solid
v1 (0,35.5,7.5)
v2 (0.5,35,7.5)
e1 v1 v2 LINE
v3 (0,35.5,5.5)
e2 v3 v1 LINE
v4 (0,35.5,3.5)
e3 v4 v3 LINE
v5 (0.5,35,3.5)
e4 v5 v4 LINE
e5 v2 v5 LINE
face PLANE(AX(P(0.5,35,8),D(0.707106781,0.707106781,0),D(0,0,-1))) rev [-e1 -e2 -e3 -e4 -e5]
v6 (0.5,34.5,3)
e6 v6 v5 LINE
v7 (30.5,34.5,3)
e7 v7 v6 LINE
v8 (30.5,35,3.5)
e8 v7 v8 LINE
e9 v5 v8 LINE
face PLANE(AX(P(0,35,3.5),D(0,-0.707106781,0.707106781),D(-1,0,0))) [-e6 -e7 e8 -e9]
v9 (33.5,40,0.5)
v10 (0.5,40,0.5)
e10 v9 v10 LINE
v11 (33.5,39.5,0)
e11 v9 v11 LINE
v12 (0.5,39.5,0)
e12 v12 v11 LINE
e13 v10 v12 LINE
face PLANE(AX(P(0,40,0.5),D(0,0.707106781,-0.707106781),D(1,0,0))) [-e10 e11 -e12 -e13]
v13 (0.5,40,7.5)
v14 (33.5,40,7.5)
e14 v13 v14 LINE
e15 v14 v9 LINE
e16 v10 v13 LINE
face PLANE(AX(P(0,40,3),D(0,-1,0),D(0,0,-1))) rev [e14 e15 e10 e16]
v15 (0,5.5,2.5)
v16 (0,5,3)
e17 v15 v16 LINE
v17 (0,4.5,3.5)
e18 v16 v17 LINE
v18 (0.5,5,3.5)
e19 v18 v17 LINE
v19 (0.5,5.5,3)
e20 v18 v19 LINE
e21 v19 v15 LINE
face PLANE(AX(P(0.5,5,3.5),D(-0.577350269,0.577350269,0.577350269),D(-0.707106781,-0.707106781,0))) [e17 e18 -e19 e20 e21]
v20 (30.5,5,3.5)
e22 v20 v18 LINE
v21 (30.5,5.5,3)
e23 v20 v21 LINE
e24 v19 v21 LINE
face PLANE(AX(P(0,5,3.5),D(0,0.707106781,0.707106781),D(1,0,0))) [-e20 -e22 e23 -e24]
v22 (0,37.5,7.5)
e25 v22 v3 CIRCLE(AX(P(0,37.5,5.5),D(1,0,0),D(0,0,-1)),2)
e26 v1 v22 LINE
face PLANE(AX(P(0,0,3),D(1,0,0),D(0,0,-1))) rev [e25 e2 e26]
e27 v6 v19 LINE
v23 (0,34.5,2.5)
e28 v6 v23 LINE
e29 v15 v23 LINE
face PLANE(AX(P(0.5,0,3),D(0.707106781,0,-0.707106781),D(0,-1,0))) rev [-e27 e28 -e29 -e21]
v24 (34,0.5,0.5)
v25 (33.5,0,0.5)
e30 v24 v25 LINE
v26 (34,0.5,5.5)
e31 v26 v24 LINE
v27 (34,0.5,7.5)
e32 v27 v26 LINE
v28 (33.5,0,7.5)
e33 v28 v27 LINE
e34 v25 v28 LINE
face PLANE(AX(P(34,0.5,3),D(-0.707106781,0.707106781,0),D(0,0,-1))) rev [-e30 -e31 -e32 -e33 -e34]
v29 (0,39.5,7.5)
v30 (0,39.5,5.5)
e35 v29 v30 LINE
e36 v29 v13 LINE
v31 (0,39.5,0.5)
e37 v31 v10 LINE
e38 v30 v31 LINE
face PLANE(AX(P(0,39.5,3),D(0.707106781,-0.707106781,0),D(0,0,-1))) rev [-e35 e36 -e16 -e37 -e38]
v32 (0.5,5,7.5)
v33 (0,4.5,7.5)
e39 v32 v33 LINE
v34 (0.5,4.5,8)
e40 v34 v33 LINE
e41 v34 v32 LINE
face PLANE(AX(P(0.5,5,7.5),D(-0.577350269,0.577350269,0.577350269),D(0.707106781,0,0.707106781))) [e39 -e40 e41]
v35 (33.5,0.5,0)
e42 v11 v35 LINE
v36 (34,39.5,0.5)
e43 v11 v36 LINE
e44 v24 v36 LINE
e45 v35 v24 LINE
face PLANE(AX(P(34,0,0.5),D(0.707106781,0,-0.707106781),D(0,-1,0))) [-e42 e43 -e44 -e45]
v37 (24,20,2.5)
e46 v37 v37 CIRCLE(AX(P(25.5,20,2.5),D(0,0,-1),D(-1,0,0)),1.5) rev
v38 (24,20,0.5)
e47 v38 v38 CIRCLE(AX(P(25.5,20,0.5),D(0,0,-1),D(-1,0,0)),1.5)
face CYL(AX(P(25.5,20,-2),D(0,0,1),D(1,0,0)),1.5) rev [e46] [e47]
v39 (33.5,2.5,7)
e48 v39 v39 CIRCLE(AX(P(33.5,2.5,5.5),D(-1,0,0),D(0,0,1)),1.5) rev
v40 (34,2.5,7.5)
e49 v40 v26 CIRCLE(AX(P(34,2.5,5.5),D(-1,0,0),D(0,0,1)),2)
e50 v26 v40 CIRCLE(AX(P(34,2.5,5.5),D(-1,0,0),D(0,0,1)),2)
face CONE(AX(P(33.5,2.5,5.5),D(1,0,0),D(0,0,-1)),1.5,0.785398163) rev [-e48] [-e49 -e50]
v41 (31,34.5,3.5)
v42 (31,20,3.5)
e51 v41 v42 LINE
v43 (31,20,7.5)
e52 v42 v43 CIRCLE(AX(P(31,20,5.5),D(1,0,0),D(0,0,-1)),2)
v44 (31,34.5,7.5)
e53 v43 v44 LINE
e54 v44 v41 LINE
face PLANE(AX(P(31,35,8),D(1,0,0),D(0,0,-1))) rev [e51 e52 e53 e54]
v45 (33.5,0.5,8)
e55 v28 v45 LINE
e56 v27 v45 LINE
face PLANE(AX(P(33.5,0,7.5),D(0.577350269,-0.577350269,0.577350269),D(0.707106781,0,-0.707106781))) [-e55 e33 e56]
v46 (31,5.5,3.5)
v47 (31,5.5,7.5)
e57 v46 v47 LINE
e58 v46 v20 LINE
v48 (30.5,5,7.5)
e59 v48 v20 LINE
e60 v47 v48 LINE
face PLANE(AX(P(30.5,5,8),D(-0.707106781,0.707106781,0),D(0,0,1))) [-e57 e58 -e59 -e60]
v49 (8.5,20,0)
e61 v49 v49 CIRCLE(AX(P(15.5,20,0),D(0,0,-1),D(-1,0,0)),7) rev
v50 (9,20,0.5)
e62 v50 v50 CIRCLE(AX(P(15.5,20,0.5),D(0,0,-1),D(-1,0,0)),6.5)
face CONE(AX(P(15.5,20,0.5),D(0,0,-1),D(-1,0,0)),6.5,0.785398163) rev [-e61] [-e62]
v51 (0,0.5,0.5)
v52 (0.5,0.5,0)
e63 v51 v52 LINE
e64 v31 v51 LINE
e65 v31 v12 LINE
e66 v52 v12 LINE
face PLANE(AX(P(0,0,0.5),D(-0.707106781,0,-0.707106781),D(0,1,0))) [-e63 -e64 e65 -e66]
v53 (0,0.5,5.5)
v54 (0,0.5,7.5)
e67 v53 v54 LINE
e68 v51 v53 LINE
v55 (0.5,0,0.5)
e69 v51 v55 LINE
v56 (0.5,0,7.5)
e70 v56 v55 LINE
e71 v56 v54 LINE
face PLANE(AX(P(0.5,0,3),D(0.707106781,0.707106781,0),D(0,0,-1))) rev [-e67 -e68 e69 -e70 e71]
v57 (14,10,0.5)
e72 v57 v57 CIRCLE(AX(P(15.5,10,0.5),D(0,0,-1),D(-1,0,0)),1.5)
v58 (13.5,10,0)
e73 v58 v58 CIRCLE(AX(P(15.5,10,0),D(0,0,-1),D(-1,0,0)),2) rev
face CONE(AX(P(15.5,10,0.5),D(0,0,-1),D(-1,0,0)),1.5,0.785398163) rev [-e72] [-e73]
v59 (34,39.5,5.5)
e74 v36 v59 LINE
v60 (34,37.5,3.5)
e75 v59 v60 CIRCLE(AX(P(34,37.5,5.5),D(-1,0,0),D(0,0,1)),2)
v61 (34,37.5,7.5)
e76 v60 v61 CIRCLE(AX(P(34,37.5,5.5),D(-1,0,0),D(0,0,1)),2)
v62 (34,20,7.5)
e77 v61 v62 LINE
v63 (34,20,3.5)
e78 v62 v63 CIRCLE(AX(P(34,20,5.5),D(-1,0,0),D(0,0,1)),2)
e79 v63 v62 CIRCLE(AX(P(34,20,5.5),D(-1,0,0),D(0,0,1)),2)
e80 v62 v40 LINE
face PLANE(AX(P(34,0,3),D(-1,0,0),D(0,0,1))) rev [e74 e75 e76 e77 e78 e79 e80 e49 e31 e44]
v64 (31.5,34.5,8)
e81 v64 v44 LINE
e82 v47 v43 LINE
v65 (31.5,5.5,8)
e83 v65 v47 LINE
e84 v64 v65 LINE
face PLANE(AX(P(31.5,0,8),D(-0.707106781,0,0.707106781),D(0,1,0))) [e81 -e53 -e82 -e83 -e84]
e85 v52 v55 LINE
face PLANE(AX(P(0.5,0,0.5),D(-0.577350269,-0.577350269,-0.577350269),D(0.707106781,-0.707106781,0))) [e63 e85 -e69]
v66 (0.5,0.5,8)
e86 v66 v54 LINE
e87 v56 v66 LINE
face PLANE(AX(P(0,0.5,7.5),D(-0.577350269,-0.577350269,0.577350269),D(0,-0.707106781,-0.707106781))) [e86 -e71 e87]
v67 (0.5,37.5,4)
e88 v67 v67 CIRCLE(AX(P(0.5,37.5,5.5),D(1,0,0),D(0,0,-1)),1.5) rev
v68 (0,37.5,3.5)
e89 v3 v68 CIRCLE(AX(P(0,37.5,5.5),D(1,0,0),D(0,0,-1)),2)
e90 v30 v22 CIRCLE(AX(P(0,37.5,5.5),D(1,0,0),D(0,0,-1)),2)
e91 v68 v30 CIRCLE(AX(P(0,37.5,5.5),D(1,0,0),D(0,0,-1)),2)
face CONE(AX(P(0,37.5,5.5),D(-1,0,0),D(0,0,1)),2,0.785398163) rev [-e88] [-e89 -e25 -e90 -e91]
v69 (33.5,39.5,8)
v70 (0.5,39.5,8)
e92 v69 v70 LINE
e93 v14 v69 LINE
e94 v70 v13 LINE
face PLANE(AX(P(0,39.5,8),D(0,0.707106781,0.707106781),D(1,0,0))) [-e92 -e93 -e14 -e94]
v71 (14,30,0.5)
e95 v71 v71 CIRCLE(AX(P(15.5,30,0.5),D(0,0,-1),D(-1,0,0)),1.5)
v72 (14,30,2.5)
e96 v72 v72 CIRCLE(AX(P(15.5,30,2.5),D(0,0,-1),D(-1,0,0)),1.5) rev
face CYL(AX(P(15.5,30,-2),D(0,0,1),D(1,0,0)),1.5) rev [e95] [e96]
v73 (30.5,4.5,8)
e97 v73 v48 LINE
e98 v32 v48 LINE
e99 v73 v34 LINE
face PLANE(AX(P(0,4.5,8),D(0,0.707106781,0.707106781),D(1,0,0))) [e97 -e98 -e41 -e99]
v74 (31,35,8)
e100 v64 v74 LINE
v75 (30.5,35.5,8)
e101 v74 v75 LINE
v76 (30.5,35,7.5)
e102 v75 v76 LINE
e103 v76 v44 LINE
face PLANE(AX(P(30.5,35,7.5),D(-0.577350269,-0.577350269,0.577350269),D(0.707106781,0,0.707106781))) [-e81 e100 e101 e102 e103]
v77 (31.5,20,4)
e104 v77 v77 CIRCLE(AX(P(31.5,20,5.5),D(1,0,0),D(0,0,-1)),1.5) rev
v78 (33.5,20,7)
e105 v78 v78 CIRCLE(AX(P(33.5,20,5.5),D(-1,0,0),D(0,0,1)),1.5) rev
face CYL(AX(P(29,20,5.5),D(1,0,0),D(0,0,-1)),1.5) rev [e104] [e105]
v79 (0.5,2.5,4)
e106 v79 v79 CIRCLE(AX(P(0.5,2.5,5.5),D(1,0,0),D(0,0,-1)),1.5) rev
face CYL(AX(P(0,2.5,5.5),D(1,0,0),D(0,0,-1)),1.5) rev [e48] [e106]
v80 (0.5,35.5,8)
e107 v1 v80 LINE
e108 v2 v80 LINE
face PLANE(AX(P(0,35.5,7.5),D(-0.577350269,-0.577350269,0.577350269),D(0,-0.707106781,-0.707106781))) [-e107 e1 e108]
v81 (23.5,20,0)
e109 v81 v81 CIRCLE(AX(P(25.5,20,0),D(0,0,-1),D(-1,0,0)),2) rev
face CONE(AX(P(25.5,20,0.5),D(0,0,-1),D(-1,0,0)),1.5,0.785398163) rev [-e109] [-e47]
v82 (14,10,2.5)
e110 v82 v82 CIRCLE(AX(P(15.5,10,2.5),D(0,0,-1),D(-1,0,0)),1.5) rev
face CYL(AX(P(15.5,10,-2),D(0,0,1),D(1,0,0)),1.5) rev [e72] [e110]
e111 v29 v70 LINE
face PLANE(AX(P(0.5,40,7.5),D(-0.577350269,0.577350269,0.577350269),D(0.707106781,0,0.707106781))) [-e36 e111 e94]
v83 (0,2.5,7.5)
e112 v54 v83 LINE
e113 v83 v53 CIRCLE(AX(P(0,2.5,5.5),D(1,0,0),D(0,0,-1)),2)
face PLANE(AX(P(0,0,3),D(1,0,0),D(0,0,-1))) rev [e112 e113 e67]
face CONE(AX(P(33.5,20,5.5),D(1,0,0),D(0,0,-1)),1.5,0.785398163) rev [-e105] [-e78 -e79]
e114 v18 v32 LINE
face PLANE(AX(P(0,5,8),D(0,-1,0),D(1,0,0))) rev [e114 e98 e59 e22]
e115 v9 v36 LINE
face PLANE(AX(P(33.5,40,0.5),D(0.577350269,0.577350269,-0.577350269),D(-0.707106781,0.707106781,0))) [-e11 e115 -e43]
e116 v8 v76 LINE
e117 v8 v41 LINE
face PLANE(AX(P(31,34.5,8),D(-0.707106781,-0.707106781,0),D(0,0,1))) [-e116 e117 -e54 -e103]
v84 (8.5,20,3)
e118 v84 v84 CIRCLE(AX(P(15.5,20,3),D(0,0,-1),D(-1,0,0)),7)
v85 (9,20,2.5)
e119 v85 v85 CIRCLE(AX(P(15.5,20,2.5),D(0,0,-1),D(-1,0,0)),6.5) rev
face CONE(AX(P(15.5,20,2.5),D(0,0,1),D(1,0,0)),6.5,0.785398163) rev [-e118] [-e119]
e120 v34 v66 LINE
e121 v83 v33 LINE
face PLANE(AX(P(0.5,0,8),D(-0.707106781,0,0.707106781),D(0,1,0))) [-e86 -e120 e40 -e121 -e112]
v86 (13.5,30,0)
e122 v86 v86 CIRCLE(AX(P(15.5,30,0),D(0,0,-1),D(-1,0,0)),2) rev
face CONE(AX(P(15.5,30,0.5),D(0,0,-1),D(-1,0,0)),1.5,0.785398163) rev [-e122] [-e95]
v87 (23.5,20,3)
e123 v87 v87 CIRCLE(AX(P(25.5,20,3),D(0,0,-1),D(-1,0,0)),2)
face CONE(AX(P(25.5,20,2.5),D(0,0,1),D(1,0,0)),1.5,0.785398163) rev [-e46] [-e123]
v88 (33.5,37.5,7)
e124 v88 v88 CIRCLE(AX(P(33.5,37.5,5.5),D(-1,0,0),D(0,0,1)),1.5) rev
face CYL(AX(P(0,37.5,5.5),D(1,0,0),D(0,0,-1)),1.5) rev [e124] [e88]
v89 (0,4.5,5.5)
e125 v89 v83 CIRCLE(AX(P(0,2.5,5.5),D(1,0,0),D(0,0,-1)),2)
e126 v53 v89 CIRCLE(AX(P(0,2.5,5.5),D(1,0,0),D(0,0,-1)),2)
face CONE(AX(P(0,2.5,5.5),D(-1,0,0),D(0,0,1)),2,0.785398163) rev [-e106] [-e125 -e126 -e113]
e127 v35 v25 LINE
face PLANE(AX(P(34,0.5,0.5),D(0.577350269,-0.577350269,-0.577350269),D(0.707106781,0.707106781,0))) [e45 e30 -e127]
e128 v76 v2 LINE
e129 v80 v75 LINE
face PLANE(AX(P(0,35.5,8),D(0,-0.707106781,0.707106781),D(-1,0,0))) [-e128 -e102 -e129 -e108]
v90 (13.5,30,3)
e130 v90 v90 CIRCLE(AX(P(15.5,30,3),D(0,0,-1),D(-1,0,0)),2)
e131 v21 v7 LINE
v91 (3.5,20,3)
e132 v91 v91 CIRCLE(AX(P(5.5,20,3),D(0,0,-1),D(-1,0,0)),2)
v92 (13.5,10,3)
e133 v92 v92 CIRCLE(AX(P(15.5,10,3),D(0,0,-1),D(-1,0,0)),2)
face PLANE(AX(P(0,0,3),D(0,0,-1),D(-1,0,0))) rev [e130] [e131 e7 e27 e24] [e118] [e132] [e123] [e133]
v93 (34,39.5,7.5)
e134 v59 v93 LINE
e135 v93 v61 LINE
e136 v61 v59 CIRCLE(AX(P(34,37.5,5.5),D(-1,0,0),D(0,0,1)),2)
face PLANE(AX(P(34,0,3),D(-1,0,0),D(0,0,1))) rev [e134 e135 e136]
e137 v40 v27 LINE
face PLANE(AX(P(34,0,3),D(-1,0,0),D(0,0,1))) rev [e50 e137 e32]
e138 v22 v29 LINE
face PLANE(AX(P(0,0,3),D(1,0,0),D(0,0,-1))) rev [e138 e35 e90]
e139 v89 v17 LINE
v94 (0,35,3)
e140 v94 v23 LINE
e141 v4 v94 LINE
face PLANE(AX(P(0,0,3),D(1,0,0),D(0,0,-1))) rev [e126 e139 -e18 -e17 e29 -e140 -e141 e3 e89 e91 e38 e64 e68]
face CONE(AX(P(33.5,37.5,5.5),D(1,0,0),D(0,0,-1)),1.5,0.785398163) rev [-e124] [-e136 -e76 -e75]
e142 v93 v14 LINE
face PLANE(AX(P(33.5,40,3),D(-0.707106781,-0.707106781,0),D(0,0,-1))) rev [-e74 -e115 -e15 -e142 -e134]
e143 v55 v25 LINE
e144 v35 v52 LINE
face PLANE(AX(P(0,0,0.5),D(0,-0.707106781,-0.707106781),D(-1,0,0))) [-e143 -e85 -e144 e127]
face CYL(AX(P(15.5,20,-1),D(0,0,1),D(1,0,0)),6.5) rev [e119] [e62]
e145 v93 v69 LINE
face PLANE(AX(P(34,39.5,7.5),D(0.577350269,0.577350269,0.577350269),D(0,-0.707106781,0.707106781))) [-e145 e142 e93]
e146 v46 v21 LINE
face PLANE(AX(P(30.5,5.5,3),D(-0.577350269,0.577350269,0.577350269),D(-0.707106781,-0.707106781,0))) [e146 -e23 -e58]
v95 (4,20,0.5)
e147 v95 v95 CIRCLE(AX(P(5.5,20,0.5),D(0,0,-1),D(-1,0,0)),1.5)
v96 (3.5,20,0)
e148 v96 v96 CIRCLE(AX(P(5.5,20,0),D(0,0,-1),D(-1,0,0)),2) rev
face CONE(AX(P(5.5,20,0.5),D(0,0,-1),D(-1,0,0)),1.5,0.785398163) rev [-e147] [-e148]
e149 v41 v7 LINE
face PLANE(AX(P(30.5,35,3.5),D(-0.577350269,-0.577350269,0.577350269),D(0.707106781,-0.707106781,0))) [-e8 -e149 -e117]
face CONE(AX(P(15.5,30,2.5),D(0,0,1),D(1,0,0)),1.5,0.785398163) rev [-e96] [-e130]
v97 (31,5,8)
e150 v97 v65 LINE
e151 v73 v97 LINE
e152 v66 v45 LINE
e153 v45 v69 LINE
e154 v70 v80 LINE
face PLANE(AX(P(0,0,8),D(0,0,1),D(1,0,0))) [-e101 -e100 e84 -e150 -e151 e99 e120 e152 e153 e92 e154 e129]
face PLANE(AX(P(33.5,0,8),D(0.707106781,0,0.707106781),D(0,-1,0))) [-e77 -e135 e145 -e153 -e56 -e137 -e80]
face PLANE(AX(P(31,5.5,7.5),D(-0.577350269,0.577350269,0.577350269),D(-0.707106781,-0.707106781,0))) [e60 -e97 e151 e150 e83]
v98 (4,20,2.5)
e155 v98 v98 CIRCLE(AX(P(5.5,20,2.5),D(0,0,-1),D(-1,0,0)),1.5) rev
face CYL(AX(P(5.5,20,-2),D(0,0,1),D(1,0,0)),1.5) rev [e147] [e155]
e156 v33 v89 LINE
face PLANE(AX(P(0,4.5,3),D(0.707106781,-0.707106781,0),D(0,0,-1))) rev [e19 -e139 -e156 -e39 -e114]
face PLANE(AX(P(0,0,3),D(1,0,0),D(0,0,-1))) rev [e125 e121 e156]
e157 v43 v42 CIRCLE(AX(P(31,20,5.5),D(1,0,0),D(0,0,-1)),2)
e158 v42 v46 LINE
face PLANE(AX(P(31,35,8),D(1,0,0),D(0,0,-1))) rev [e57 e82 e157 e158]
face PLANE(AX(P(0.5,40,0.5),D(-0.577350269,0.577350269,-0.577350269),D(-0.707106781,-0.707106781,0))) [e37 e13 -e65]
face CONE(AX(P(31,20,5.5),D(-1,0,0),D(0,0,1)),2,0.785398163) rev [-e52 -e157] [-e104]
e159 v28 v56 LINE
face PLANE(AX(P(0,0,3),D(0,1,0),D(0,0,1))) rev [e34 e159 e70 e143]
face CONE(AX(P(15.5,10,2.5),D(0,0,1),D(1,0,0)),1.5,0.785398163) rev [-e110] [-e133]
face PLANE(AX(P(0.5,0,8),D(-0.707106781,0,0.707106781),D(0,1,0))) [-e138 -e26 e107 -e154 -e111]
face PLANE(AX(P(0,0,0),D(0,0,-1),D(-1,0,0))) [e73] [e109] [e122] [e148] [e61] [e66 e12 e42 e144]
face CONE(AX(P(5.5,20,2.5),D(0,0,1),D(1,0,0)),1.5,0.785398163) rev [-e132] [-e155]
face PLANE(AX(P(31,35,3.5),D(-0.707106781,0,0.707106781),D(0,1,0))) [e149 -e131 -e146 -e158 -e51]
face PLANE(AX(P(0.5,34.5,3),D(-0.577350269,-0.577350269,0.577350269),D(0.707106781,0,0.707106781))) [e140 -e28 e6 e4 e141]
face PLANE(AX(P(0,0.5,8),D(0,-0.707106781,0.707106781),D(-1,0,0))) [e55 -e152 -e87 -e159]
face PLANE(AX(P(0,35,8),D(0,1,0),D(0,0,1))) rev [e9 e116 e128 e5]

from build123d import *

# Parameters (mm, degrees)
ESQUISSE1_W             = 34
ESQUISSE1_H             = 40
BOSS_EXTRU_1_DEPTH      = 3
ESQUISSE2_R             = 6.5
ENL_V_MAT_EXTRU_1_DEPTH = 4
ESQUISSE5_R             = 1.5
ENL_V_MAT_EXTRU_3_DEPTH = 5
ESQUISSE9_W             = 34
ESQUISSE9_H             = 5
BOSS_EXTRU_5_DEPTH      = 5
ESQUISSE10_R            = 1.5
ENL_V_MAT_EXTRU_6_DEPTH = 54.103672189
ESQUISSE11_W            = 3
ESQUISSE11_H            = 30
BOSS_EXTRU_6_DEPTH      = 5
ESQUISSE12_R            = 1.5
ENL_V_MAT_EXTRU_7_DEPTH = 5
CHANFREIN1_SIZE         = 0.5


with BuildPart() as part:
    # Esquisse1 → Boss.-Extru.1 (new body)
    with BuildSketch(Plane.XY):
        with Locations((17, 20)):
            Rectangle(ESQUISSE1_W, ESQUISSE1_H)
    extrude(amount=BOSS_EXTRU_1_DEPTH)

    # Esquisse2 → Enlèv. mat.-Extru.1 (cut)
    with BuildSketch(Plane.XY.offset(3)):
        with Locations((15.5, 20)):
            Circle(ESQUISSE2_R)
    extrude(amount=-ENL_V_MAT_EXTRU_1_DEPTH, mode=Mode.SUBTRACT)

    # Esquisse5 → Enlèv. mat.-Extru.3 (cut)
    with BuildSketch(Plane.XY.offset(3)):
        with Locations((15.5, 30)):
            Circle(ESQUISSE5_R)
        with Locations((5.5, 20)):
            Circle(ESQUISSE5_R)
        with Locations((15.5, 10)):
            Circle(ESQUISSE5_R)
        with Locations((25.5, 20)):
            Circle(ESQUISSE5_R)
    extrude(amount=-ENL_V_MAT_EXTRU_3_DEPTH, mode=Mode.SUBTRACT)

    # Esquisse9 → Boss.-Extru.5 (add)
    with BuildSketch(Plane.XY.offset(3)):
        with Locations((17, 37.5)):
            Rectangle(ESQUISSE9_W, ESQUISSE9_H)
        with Locations((17, 2.5)):
            Rectangle(ESQUISSE9_W, ESQUISSE9_H)
    extrude(amount=BOSS_EXTRU_5_DEPTH)

    # Esquisse10 → Enlèv. mat.-Extru.6 (cut, through all)
    with BuildSketch(Plane(origin=(34, 0, 0), x_dir=(0, 0, -1), z_dir=(1, 0, 0))):
        with Locations((-5.5, 37.5)):
            Circle(ESQUISSE10_R)
        with Locations(Location((-5.5, 2.5, 0), (0, 0, 180))):
            Circle(ESQUISSE10_R)
    extrude(amount=-ENL_V_MAT_EXTRU_6_DEPTH, mode=Mode.SUBTRACT)

    # Esquisse11 → Boss.-Extru.6 (add)
    with BuildSketch(Plane.XY.offset(3)):
        with Locations((32.5, 20)):
            Rectangle(ESQUISSE11_W, ESQUISSE11_H)
    extrude(amount=BOSS_EXTRU_6_DEPTH)

    # Esquisse12 → Enlèv. mat.-Extru.7 (cut)
    with BuildSketch(Plane(origin=(34, 0, 0), x_dir=(0, 0, -1), z_dir=(1, 0, 0))):
        with Locations((-5.5, 20)):
            Circle(ESQUISSE12_R)
    extrude(amount=-ENL_V_MAT_EXTRU_7_DEPTH, mode=Mode.SUBTRACT)

    # Chanfrein1
    chanfrein1_edges = [part.edges().sort_by_distance(p)[0] for p in [
        (9, 20, 0),
        (9, 20, 3),
        (14, 30, 0),
        (14, 30, 3),
        (4, 20, 0),
        (4, 20, 3),
        (14, 10, 0),
        (14, 10, 3),
        (24, 20, 0),
        (24, 20, 3),
        (0, 20, 3),
        (15.5, 35, 3),
        (0, 35, 5.5),
        (0, 37.5, 8),
        (15.5, 35, 8),
        (34, 20, 8),
        (17, 40, 8),
        (17, 40, 0),
        (34, 20, 0),
        (0, 5, 5.5),
        (17, 0, 0),
        (0, 2.5, 8),
        (17, 0, 8),
        (0, 20, 0),
        (0, 37.5, 7),
        (34, 37.5, 7),
        (0, 2.5, 4),
        (34, 2.5, 4),
        (0, 40, 4),
        (15.5, 5, 8),
        (15.5, 5, 3),
        (34, 40, 4),
        (34, 0, 4),
        (0, 0, 4),
        (31, 20, 3),
        (31, 35, 5.5),
        (31, 5, 5.5),
        (31, 20, 8),
        (31, 20, 7),
        (34, 20, 7),
    ]]
    chamfer(chanfrein1_edges, length=CHANFREIN1_SIZE - 0.0001)  # a hair under: the kernel refuses the full size


solid = part.part
